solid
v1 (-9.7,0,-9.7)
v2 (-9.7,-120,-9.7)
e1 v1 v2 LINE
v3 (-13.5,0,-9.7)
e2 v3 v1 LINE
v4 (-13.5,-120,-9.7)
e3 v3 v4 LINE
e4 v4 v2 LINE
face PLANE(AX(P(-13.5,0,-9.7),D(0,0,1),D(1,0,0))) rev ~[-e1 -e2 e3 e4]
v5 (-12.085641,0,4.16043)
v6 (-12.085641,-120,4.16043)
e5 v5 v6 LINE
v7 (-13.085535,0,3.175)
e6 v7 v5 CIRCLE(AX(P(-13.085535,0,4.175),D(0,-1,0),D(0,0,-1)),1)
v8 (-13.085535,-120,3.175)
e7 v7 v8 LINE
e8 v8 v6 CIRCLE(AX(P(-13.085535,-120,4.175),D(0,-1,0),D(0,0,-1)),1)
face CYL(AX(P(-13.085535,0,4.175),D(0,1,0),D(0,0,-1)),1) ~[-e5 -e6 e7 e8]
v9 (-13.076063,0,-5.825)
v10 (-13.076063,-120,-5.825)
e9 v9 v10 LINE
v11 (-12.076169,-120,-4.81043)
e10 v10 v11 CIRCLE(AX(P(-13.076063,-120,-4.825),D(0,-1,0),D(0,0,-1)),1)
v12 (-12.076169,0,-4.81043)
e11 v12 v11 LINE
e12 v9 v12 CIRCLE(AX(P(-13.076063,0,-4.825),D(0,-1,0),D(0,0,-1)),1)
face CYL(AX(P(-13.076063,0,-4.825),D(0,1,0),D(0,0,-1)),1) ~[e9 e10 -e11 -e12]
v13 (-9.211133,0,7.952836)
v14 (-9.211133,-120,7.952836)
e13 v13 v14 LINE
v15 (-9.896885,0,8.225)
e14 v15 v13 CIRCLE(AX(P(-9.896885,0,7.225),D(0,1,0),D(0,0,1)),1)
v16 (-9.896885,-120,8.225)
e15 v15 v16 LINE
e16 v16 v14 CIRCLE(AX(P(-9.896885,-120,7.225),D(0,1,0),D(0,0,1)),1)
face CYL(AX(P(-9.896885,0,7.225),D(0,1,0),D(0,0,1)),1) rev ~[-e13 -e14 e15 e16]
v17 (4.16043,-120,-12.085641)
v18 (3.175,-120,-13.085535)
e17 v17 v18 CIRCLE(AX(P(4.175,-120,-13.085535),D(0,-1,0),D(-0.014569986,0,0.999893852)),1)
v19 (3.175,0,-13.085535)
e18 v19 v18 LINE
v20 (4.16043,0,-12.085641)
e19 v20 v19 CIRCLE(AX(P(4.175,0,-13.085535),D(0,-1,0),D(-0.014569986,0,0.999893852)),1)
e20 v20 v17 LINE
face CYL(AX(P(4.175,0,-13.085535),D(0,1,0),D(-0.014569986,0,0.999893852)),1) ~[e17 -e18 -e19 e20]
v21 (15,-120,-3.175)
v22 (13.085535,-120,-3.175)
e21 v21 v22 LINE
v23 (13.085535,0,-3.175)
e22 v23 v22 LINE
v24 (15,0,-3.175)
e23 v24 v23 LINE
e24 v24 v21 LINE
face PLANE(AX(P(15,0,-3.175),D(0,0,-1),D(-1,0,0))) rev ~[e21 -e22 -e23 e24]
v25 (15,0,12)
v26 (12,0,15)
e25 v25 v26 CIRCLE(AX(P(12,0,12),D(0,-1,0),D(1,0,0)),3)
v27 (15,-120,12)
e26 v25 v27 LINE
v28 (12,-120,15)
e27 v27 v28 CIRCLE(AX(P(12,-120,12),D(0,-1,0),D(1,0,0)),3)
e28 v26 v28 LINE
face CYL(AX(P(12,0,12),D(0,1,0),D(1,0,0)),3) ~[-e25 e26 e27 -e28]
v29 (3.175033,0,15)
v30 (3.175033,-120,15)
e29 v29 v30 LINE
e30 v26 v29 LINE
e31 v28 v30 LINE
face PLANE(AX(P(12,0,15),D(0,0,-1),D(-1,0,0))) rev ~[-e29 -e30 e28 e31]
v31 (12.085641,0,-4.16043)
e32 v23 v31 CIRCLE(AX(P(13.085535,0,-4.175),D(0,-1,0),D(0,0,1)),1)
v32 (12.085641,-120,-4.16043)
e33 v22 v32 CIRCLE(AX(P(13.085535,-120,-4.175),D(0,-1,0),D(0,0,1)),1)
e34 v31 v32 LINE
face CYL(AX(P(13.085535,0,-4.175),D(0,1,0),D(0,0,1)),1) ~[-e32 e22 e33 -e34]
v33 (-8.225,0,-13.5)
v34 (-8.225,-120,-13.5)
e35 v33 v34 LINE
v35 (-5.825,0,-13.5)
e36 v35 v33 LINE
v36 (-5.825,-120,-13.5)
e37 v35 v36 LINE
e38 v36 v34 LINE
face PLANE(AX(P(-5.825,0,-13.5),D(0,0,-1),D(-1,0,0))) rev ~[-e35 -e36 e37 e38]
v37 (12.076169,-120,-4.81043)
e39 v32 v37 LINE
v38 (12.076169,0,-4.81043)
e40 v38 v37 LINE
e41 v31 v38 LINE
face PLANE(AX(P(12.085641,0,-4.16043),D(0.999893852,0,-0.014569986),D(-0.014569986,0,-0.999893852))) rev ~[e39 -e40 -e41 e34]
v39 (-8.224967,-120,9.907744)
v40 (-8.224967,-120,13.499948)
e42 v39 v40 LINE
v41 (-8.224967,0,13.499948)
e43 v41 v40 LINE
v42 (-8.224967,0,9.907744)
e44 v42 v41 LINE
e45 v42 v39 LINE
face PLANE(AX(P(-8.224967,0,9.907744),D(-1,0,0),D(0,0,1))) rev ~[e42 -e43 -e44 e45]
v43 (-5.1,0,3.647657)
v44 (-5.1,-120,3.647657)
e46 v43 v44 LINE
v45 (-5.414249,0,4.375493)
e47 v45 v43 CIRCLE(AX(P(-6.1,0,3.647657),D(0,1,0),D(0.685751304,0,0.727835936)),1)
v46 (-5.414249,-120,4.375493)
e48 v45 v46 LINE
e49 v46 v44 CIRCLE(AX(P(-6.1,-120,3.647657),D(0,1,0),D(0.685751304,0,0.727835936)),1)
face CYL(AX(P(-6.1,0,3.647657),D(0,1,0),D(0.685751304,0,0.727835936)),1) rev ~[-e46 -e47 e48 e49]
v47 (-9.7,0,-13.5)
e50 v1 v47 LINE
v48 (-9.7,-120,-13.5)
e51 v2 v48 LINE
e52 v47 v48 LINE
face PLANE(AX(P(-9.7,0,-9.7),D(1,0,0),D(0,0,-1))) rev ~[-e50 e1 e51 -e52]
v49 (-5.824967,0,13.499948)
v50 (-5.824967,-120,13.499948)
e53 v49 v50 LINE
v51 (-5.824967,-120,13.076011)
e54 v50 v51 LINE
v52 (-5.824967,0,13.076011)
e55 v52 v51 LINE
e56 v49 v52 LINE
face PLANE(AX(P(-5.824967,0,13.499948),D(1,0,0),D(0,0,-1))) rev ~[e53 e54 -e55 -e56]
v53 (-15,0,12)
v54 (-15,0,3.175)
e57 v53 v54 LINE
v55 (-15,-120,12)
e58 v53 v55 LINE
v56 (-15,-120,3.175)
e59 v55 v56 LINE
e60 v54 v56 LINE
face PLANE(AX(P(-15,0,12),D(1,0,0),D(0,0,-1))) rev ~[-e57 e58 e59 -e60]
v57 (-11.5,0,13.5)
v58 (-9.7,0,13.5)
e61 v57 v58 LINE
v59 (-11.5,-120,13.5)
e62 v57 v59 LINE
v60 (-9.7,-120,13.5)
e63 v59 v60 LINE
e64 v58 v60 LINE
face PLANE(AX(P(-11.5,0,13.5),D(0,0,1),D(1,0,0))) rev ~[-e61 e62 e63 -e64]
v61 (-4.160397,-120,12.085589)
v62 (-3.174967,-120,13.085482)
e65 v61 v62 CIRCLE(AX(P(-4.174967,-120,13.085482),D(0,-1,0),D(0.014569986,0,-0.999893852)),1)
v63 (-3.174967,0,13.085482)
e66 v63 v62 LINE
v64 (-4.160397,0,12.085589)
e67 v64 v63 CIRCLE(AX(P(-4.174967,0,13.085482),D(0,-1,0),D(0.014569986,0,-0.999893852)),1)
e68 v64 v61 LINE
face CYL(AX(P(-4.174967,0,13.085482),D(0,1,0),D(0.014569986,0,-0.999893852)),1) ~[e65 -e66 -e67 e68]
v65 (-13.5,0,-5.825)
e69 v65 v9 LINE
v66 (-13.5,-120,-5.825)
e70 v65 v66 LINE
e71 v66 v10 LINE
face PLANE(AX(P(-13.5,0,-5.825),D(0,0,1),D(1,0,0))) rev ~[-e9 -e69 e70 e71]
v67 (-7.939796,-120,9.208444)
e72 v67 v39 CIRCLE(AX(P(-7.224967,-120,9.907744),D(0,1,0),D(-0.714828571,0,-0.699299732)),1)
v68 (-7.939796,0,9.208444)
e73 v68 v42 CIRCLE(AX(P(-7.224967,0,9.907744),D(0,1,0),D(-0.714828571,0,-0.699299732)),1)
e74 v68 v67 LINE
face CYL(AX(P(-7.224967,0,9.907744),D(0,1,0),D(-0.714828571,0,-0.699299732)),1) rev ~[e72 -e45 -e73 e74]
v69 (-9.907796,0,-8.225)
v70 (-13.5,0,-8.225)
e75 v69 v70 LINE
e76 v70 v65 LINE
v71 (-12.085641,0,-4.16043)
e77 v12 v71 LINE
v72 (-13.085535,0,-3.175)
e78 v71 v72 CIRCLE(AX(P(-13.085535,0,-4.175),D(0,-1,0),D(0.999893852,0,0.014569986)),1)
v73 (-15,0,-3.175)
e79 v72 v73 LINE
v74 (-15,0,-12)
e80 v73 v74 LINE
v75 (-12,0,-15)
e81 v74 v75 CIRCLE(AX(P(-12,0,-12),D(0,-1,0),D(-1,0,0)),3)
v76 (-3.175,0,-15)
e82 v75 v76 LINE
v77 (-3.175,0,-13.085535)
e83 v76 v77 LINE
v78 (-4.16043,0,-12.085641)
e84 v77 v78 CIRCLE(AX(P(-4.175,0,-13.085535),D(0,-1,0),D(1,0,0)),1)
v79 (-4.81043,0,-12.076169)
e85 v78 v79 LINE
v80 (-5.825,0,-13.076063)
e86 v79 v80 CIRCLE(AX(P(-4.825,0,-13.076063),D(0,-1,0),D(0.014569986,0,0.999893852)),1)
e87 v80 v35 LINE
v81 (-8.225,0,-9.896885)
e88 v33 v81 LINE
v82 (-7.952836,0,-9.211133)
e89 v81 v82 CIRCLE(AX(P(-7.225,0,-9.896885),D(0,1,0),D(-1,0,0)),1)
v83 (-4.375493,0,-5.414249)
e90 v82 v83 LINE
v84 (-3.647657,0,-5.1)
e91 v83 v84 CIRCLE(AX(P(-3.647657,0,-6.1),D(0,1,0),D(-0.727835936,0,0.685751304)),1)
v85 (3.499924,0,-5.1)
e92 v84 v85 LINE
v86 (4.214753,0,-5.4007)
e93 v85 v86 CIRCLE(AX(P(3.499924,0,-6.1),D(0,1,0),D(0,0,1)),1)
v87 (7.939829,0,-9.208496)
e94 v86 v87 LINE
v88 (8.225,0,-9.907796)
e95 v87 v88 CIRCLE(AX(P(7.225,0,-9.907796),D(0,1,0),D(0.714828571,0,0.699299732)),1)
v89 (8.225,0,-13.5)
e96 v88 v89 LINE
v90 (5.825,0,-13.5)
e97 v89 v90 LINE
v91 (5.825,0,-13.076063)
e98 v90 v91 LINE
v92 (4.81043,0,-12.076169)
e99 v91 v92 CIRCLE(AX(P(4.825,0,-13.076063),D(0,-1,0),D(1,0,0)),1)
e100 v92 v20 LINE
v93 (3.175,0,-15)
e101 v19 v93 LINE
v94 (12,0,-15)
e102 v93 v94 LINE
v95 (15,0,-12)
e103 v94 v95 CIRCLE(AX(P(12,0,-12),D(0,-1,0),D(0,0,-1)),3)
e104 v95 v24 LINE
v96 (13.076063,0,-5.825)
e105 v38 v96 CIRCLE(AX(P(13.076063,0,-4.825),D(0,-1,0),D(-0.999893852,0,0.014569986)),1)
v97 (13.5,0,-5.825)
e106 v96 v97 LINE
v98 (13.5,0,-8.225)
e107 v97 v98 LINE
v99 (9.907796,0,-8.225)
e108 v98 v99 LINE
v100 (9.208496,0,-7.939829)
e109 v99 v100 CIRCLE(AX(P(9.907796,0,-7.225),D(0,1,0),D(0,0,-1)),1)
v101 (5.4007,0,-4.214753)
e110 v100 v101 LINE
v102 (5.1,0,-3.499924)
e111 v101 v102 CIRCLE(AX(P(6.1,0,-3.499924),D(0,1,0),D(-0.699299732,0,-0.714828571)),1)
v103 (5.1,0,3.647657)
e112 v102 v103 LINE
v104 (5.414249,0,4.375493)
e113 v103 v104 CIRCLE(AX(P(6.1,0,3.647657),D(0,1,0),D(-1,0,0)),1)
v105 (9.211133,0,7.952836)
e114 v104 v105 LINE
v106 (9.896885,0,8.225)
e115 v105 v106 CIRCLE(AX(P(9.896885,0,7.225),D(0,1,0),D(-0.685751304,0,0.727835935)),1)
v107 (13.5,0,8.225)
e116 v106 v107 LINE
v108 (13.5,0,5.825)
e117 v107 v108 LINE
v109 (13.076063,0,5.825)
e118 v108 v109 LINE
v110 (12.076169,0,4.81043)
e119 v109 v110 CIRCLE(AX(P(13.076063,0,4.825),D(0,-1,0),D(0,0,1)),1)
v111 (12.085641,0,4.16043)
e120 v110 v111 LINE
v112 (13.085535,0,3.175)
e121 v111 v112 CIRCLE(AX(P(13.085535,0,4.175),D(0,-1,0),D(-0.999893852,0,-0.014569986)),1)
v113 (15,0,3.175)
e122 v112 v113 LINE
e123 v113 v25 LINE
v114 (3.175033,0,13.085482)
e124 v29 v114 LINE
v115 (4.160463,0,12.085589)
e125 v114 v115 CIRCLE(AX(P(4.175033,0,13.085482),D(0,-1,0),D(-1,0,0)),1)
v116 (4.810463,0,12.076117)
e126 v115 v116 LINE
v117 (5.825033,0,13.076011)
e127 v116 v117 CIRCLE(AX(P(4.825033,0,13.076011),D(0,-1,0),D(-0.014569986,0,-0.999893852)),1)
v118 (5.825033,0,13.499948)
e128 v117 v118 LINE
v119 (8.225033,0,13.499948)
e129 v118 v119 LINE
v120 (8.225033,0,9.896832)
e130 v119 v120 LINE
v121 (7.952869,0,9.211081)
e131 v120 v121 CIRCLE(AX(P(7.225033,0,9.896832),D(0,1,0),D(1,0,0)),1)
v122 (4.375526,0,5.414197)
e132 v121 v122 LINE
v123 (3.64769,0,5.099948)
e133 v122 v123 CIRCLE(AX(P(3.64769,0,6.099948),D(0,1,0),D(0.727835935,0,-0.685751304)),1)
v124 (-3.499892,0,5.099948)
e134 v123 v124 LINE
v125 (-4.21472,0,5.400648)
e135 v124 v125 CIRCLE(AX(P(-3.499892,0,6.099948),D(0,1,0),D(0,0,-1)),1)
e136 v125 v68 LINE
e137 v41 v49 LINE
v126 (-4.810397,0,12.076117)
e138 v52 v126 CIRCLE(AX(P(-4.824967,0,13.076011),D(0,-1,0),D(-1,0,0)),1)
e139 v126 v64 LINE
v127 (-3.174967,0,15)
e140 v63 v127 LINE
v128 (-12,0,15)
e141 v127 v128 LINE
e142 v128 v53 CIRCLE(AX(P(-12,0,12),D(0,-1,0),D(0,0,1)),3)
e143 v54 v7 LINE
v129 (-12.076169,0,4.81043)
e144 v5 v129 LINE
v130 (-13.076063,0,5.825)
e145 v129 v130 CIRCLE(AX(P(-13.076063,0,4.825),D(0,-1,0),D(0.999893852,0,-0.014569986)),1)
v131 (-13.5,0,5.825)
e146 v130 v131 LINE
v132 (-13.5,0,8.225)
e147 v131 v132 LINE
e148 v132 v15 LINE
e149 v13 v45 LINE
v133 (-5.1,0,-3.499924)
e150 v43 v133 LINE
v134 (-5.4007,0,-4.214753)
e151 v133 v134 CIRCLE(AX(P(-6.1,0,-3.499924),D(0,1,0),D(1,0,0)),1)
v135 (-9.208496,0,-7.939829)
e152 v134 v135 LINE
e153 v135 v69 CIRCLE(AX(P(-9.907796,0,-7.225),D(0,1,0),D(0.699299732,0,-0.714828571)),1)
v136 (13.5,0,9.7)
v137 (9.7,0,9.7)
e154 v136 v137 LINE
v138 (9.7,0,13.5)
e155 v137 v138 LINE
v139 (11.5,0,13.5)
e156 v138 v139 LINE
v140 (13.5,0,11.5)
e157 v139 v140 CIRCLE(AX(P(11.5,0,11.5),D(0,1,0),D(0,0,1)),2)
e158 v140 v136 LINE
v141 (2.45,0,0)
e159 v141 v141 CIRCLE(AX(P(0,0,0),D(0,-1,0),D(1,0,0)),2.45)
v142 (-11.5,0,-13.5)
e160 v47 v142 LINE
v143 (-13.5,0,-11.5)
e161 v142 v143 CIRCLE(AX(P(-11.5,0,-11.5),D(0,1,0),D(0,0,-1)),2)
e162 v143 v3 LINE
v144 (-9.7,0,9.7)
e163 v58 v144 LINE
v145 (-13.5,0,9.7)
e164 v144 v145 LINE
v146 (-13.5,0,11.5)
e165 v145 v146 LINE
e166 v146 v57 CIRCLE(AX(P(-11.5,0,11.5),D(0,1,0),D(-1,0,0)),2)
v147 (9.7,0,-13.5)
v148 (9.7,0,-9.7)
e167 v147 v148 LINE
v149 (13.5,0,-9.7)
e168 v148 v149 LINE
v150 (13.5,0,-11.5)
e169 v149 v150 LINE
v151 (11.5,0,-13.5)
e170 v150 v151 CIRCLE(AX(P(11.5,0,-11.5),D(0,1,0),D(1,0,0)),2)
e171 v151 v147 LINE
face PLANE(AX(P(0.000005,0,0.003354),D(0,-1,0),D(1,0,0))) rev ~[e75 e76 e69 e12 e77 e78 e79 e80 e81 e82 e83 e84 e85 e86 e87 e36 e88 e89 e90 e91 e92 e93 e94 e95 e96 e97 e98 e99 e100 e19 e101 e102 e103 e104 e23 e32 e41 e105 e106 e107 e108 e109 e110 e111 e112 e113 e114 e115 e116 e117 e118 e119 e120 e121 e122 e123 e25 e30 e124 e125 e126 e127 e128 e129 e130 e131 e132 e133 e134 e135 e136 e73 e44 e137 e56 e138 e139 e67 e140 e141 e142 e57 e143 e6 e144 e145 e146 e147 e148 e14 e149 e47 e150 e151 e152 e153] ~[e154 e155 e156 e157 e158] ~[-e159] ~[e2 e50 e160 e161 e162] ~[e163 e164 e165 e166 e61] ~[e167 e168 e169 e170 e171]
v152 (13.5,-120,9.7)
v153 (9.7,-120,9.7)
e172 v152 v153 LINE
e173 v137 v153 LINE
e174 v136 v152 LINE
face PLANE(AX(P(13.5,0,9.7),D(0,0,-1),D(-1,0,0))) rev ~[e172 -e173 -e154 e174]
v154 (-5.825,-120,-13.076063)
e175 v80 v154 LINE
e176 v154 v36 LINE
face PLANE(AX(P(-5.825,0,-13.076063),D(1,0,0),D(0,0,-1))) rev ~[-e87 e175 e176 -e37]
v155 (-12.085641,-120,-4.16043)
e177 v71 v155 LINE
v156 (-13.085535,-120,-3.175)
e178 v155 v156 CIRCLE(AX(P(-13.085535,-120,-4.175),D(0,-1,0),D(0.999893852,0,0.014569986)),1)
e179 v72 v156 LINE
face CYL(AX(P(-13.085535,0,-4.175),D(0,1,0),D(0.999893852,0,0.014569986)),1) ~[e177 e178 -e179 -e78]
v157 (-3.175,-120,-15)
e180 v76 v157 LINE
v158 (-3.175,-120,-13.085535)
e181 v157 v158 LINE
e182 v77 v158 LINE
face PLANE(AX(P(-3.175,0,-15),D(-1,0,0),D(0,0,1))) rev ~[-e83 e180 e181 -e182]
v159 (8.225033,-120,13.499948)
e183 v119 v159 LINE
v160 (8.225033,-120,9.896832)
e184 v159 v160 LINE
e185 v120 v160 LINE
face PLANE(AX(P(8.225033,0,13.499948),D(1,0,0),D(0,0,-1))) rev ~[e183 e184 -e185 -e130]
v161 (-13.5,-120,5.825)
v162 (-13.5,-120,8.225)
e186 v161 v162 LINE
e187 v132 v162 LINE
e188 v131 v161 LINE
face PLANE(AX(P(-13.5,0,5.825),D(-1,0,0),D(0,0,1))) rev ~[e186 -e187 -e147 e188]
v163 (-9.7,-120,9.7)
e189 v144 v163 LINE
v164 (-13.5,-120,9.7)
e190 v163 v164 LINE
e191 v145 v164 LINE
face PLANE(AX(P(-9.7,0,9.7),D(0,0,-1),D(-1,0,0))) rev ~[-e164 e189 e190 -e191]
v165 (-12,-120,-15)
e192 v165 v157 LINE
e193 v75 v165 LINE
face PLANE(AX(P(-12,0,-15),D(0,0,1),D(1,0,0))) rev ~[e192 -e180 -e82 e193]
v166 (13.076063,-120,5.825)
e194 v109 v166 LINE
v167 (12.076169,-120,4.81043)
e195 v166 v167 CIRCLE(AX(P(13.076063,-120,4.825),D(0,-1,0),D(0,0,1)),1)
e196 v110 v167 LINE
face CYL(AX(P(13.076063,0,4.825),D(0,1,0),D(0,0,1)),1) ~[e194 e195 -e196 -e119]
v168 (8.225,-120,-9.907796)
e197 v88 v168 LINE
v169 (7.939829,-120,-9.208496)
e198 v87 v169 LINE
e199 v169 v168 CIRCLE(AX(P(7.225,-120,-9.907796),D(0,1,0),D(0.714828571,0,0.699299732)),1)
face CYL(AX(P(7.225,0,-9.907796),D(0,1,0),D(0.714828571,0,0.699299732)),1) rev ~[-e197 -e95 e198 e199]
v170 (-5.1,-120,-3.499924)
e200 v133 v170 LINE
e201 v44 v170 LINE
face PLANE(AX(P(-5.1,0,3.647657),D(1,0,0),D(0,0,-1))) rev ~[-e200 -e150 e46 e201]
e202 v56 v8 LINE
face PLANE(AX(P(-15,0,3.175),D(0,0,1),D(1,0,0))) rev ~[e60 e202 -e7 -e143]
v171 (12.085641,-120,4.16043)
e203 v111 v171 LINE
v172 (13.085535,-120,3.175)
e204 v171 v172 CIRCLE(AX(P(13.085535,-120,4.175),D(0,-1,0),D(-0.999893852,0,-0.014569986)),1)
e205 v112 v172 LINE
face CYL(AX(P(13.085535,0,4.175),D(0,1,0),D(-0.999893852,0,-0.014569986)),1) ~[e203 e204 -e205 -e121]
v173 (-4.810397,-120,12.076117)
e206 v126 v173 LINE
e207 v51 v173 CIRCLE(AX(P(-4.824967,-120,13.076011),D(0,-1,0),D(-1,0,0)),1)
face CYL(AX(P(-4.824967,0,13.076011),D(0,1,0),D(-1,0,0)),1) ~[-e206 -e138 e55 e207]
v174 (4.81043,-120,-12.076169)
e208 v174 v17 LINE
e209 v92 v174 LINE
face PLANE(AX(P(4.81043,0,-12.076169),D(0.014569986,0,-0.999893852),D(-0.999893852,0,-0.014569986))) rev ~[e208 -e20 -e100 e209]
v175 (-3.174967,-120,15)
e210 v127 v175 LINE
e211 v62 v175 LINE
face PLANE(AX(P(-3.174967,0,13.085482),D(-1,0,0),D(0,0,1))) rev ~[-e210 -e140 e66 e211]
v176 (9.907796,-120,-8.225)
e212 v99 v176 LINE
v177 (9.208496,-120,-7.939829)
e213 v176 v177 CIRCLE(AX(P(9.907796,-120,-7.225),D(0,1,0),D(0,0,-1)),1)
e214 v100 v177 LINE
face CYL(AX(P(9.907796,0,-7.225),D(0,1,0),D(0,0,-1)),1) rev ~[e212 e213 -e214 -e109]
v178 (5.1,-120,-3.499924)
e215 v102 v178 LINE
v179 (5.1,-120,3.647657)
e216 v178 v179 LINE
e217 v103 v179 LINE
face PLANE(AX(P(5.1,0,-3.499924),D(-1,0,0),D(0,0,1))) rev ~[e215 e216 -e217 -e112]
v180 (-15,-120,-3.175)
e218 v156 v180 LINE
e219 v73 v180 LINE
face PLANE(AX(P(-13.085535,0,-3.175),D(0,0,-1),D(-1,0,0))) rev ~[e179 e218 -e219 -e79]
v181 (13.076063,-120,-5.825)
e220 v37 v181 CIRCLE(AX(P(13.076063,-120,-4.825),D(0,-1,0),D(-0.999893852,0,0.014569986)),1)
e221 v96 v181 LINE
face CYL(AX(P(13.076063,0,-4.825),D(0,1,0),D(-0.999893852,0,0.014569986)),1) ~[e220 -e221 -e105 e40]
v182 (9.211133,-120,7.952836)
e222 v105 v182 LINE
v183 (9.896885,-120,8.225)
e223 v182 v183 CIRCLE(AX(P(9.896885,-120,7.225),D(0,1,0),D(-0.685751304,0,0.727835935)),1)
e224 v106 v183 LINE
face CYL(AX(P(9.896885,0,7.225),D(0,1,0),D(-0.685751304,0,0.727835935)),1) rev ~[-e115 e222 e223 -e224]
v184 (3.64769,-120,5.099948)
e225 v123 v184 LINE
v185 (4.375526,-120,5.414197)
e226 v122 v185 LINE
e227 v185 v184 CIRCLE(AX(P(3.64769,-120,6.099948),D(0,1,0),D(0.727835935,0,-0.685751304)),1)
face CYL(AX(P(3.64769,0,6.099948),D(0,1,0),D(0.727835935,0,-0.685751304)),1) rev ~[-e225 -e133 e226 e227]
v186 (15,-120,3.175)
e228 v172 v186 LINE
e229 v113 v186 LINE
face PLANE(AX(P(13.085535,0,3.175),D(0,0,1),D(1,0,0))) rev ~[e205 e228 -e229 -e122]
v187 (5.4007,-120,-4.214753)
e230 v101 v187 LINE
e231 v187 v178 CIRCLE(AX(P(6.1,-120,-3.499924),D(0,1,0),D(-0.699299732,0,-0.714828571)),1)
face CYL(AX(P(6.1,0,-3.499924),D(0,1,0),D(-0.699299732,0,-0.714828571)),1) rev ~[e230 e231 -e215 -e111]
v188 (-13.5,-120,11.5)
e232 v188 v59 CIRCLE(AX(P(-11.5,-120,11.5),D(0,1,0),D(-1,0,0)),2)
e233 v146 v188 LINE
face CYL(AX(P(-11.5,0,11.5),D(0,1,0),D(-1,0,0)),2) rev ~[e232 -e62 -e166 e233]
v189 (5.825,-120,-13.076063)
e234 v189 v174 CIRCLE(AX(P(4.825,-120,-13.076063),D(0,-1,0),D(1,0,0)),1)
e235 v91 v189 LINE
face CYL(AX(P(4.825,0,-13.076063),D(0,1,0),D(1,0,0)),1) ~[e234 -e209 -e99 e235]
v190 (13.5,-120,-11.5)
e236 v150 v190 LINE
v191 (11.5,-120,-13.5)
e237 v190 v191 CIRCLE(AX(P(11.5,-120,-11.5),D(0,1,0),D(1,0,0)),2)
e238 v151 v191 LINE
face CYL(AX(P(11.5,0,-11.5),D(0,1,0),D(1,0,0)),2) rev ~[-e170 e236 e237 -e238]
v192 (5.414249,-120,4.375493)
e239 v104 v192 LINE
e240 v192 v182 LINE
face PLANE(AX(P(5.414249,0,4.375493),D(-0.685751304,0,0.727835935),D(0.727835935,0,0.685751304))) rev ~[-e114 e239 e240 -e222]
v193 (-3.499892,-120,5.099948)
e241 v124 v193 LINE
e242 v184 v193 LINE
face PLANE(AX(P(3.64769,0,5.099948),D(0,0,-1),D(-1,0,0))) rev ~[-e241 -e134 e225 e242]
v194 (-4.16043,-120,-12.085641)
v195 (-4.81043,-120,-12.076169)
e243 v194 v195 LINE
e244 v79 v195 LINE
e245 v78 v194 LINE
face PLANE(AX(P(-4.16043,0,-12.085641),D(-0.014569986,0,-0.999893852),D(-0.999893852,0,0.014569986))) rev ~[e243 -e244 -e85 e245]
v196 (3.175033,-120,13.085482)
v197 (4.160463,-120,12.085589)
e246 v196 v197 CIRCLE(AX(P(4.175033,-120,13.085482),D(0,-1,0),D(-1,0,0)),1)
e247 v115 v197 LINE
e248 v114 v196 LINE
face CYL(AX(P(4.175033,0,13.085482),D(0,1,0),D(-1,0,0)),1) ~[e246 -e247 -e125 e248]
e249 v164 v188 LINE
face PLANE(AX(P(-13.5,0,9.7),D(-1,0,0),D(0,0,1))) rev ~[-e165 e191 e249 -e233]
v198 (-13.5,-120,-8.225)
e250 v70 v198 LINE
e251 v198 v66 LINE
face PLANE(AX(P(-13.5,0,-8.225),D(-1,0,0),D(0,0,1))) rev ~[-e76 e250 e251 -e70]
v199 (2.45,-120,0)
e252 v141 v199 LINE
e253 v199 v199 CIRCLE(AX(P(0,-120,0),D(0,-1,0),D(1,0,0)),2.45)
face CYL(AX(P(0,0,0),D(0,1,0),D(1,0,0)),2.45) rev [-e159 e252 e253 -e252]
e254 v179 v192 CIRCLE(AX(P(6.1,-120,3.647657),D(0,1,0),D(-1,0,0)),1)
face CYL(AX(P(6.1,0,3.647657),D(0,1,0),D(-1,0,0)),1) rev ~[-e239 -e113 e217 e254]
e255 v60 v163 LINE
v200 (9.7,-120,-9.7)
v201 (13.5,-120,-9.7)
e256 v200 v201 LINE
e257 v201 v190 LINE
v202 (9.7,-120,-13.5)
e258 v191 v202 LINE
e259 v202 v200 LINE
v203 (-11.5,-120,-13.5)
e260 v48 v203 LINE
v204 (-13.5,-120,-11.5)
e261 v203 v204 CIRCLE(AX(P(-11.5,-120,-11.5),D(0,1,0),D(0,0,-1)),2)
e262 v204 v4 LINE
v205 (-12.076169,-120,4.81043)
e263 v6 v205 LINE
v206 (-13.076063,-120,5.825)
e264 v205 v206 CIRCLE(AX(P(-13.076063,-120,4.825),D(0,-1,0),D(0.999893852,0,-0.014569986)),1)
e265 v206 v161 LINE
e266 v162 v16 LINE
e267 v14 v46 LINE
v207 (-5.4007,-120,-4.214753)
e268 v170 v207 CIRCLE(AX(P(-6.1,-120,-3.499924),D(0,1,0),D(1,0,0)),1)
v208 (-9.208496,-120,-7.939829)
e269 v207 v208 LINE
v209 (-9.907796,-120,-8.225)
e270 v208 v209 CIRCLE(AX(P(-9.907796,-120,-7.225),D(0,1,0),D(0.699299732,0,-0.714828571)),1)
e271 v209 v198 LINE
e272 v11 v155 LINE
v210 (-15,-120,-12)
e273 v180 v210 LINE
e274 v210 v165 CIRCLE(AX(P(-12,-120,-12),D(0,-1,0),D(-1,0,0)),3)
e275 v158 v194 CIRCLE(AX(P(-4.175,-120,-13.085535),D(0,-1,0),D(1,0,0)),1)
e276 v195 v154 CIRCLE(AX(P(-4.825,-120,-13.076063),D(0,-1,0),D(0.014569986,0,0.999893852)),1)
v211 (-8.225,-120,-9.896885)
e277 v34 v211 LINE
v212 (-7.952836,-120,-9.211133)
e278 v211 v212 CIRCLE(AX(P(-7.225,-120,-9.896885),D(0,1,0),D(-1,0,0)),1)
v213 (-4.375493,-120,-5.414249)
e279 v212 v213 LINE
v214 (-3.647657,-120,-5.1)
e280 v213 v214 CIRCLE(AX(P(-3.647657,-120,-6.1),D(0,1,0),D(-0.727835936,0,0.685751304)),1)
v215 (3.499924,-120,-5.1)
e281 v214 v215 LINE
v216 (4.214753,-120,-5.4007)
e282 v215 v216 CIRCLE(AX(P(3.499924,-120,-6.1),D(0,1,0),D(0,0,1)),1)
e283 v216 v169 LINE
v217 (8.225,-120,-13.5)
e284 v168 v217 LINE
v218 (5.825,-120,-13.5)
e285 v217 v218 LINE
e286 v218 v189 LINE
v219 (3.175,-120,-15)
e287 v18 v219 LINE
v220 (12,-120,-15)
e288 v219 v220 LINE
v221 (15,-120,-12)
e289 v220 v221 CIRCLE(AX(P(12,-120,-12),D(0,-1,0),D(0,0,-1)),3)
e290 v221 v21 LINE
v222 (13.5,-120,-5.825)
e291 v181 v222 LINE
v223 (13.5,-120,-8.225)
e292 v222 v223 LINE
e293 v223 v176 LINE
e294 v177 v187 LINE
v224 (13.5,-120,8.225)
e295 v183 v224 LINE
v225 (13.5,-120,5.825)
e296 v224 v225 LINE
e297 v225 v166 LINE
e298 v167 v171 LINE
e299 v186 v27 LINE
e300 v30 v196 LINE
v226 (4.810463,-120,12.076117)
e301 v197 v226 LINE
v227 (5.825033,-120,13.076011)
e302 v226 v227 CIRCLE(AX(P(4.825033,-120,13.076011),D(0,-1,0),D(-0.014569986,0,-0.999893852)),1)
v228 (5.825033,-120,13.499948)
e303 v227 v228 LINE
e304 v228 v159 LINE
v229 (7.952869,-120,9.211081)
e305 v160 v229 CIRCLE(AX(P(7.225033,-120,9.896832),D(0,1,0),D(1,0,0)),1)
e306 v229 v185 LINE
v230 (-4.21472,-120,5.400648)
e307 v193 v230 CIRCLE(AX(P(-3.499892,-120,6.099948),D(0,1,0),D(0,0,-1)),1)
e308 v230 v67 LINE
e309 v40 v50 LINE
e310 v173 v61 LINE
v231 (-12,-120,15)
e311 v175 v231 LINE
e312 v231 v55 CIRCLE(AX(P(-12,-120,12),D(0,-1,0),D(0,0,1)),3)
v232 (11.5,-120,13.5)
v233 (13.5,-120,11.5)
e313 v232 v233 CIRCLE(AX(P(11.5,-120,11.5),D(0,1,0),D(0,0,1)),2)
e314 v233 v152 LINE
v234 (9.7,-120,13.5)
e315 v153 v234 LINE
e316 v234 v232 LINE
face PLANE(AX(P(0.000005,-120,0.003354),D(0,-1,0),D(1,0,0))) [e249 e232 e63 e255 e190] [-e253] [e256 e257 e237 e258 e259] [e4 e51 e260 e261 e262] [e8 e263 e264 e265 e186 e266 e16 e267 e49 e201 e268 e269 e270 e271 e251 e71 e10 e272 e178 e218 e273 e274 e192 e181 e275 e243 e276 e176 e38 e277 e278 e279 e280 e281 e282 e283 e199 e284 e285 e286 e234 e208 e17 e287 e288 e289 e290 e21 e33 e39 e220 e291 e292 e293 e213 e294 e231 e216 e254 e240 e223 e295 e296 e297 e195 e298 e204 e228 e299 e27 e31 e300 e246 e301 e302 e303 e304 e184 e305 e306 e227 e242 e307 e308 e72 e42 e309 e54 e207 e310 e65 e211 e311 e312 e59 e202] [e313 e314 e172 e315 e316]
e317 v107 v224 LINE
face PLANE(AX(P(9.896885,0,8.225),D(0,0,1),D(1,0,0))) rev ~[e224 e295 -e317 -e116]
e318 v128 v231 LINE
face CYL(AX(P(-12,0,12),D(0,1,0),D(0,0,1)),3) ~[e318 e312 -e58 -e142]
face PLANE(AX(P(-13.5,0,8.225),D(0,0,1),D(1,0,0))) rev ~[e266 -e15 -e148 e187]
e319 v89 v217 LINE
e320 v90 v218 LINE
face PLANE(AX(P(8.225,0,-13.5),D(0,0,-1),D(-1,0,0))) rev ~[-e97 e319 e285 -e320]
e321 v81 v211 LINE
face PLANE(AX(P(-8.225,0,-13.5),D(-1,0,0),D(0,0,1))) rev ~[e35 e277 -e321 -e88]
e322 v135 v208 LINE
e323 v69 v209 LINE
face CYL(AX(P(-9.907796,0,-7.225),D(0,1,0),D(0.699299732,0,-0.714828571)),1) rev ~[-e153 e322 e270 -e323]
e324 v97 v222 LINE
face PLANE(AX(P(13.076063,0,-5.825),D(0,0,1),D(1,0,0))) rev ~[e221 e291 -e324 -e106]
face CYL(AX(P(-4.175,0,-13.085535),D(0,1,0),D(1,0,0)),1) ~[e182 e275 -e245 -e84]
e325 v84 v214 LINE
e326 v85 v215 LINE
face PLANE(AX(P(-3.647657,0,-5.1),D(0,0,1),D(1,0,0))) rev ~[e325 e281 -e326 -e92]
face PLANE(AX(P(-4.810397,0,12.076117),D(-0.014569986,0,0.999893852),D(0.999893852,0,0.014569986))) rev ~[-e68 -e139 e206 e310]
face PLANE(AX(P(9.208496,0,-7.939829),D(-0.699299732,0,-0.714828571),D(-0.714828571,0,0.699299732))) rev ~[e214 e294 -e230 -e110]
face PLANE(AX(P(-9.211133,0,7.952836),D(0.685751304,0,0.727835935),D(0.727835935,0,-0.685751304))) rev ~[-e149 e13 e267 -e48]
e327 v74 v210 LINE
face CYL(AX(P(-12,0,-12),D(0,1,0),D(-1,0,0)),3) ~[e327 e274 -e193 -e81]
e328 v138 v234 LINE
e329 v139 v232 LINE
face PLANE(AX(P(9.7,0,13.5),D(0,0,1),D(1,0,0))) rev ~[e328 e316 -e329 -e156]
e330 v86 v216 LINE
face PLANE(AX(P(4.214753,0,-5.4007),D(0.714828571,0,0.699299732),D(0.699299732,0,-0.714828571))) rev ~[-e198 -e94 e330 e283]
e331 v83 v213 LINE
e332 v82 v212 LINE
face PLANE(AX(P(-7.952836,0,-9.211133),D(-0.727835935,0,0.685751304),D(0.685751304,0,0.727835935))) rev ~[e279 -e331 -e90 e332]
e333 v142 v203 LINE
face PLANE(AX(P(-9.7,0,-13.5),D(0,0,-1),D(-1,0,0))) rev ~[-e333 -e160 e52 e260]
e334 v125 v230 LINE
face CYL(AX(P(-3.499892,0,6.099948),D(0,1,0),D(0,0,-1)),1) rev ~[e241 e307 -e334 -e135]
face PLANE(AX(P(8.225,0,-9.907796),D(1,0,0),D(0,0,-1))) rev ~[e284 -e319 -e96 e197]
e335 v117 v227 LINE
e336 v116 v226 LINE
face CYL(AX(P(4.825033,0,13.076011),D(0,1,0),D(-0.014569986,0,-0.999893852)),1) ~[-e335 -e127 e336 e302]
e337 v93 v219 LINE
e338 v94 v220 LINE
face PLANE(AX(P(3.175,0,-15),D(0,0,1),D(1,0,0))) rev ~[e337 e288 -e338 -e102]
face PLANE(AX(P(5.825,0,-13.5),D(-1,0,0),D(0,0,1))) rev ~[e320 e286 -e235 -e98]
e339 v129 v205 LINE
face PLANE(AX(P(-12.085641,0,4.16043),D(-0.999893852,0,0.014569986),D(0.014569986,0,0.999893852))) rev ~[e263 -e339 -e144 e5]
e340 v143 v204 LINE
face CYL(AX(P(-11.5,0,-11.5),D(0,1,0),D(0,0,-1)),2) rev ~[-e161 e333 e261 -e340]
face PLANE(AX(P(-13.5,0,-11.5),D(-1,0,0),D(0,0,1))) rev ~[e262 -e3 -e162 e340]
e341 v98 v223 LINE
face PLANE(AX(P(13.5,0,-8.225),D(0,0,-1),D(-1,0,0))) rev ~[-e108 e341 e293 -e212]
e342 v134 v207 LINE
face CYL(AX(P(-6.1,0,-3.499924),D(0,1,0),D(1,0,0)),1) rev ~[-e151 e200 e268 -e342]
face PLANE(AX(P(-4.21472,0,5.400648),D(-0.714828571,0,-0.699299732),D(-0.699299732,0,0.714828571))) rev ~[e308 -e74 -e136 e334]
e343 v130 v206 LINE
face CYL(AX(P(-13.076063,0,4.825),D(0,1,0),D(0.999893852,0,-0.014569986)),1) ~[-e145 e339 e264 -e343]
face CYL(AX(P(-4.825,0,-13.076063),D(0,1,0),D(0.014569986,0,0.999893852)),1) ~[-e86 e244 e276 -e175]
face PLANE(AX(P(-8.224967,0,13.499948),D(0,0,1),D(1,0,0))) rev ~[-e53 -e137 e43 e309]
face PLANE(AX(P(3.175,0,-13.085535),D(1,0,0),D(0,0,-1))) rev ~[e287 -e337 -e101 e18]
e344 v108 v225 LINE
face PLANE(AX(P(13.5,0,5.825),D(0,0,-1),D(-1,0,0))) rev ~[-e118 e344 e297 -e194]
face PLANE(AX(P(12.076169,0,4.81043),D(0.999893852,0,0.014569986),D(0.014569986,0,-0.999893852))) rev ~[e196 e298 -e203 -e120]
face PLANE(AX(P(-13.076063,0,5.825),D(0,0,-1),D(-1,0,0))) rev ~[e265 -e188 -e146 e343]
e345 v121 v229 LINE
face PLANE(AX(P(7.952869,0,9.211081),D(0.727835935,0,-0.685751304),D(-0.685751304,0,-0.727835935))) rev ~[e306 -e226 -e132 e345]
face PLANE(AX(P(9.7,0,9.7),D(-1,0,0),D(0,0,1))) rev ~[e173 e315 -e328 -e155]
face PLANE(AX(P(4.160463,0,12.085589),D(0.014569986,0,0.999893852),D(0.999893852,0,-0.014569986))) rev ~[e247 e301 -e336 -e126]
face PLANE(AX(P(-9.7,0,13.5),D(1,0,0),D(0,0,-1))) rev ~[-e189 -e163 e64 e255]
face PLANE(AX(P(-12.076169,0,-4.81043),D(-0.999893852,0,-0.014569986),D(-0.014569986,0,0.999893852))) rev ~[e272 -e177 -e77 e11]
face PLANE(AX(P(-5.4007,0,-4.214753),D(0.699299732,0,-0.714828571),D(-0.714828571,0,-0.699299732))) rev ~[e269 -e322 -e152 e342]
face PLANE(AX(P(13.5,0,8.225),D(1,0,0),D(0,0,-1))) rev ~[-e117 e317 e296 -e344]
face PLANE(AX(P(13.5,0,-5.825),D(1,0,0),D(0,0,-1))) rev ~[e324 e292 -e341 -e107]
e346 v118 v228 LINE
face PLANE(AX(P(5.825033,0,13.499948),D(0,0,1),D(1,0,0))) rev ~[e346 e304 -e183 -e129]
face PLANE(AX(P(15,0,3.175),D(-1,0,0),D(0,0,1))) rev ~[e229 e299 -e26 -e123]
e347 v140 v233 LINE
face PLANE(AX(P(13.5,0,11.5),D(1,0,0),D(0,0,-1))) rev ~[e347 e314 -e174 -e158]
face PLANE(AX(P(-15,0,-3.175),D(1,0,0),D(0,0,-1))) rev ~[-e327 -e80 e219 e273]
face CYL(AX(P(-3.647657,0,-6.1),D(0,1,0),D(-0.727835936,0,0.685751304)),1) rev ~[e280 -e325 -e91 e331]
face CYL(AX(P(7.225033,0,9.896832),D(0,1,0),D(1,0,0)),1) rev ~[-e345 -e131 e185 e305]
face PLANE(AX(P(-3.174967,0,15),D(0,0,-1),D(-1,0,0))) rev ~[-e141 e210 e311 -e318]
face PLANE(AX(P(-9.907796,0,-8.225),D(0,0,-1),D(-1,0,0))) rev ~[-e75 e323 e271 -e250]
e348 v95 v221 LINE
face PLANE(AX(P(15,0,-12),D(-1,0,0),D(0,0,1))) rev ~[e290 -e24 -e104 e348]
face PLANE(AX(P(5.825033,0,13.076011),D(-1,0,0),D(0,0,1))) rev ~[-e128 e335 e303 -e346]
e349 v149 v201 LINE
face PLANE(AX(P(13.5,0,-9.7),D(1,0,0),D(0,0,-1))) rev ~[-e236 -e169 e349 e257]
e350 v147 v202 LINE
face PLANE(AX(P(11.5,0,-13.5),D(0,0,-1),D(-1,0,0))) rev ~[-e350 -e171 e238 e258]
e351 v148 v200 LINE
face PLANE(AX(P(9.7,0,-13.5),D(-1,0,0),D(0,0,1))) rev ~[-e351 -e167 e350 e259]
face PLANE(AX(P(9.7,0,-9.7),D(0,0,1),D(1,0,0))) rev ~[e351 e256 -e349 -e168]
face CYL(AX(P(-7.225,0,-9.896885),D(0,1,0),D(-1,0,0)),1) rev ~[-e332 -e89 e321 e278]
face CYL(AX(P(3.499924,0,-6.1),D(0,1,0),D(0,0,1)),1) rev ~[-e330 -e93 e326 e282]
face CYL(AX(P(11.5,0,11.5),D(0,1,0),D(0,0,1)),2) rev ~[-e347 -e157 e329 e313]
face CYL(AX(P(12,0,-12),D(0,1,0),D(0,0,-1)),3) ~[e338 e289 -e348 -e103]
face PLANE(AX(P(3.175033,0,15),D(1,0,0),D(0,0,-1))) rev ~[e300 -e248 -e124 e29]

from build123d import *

# Parameters (mm, degrees)
F0_R     = 2.45
F1_DEPTH = 460
F2_DEPTH = 340


# Not quite as in the source:
# - ends of sketch curves that miss each other by under 0.0002 mm in the source are joined


with BuildPart() as f1:
    # F0 (on Front) → F1 (new body)
    with BuildSketch(Plane.XZ):
        with BuildLine():
            Line((-3.1749674082, 15), (-12, 15))
            ThreePointArc((-12, 15), (-14.1213203436, 14.1213203436), (-15, 12))
            Line((-15, 12), (-15, 3.175))
            Line((-15, 3.175), (-13.0855346263, 3.175))
            ThreePointArc((-13.0855346263, 3.175), (-12.3835980145, 3.4627605788), (-12.0856407741, 4.1604300138))
            Line((-12.0856407741, 4.1604300138), (-12.0761692778, 4.8104300138))
            ThreePointArc((-12.0761692778, 4.8104300138), (-12.3638237087, 5.5269366118), (-13.0760631299, 5.825))
            Line((-13.0760631299, 5.825), (-13.5, 5.825))
            Line((-13.5, 5.825), (-13.5, 8.225))
            Line((-13.5, 8.225), (-9.8968845016, 8.225))
            ThreePointArc((-9.8968845016, 8.225), (-9.5279915195, 8.1544718757), (-9.2111331975, 7.9528359354))
            Line((-9.2111331975, 7.9528359354), (-5.4142486959, 4.3754933338))
            ThreePointArc((-5.4142486959, 4.3754933338), (-5.1819174045, 4.0440465354), (-5.1, 3.6476573984))
            Line((-5.1, 3.6476573984), (-5.1, -3.4999243287))
            ThreePointArc((-5.1, -3.4999243287), (-5.1782354607, -3.8876744211), (-5.4007002683, -4.2147528992))
            Line((-5.4007002683, -4.2147528992), (-9.2084959767, -7.9398285705))
            ThreePointArc((-9.2084959767, -7.9398285705), (-9.5301904718, -8.1509666761), (-9.9077957084, -8.225))
            Line((-9.9077957084, -8.225), (-13.5, -8.225))
            Line((-13.5, -8.225), (-13.5, -5.825))
            Line((-13.5, -5.825), (-13.0760631299, -5.825))
            ThreePointArc((-13.0760631299, -5.825), (-12.3638237087, -5.5269366118), (-12.0761692778, -4.8104300138))
            Line((-12.0761692778, -4.8104300138), (-12.0856407741, -4.1604300138))
            ThreePointArc((-12.0856407741, -4.1604300138), (-12.3835980145, -3.4627605788), (-13.0855346263, -3.175))
            Line((-13.0855346263, -3.175), (-15, -3.175))
            Line((-15, -3.175), (-15, -12))
            ThreePointArc((-15, -12), (-14.1213203436, -14.1213203436), (-12, -15))
            Line((-12, -15), (-3.175, -15))
            Line((-3.175, -15), (-3.175, -13.0855346263))
            ThreePointArc((-3.175, -13.0855346263), (-3.4627605788, -12.3835980145), (-4.1604300138, -12.0856407741))
            Line((-4.1604300138, -12.0856407741), (-4.8104300138, -12.0761692778))
            ThreePointArc((-4.8104300138, -12.0761692778), (-5.5269366118, -12.3638237087), (-5.825, -13.0760631299))
            Line((-5.825, -13.0760631299), (-5.825, -13.5))
            Line((-5.825, -13.5), (-8.225, -13.5))
            Line((-8.225, -13.5), (-8.225, -9.8968845016))
            ThreePointArc((-8.225, -9.8968845016), (-8.1544718757, -9.5279915195), (-7.9528359354, -9.2111331975))
            Line((-7.9528359354, -9.2111331975), (-4.3754933338, -5.4142486959))
            ThreePointArc((-4.3754933338, -5.4142486959), (-4.0440465354, -5.1819174045), (-3.6476573984, -5.1))
            Line((-3.6476573984, -5.1), (3.4999243287, -5.1))
            ThreePointArc((3.4999243287, -5.1), (3.8876744211, -5.1782354607), (4.2147528992, -5.4007002683))
            Line((4.2147528992, -5.4007002683), (7.9398285705, -9.2084959767))
            ThreePointArc((7.9398285705, -9.2084959767), (8.1509666761, -9.5301904718), (8.225, -9.9077957084))
            Line((8.225, -9.9077957084), (8.225, -13.5))
            Line((8.225, -13.5), (5.825, -13.5))
            Line((5.825, -13.5), (5.825, -13.0760631299))
            ThreePointArc((5.825, -13.0760631299), (5.5269366118, -12.3638237087), (4.8104300138, -12.0761692778))
            Line((4.8104300138, -12.0761692778), (4.1604300138, -12.0856407741))
            ThreePointArc((4.1604300138, -12.0856407741), (3.4627605788, -12.3835980145), (3.175, -13.0855346263))
            Line((3.175, -13.0855346263), (3.175, -15))
            Line((3.175, -15), (12, -15))
            ThreePointArc((12, -15), (14.1213203436, -14.1213203436), (15, -12))
            Line((15, -12), (15, -3.175))
            Line((15, -3.175), (13.0855346263, -3.175))
            ThreePointArc((13.0855346263, -3.175), (12.3835980145, -3.4627605788), (12.0856407741, -4.1604300138))
            Line((12.0856407741, -4.1604300138), (12.0761692778, -4.8104300138))
            ThreePointArc((12.0761692778, -4.8104300138), (12.3638237087, -5.5269366118), (13.0760631299, -5.825))
            Line((13.0760631299, -5.825), (13.5, -5.825))
            Line((13.5, -5.825), (13.5, -8.225))
            Line((13.5, -8.225), (9.9077957084, -8.225))
            ThreePointArc((9.9077957084, -8.225), (9.5301904718, -8.1509666761), (9.2084959767, -7.9398285705))
            Line((9.2084959767, -7.9398285705), (5.4007002683, -4.2147528992))
            ThreePointArc((5.4007002683, -4.2147528992), (5.1782354607, -3.8876744211), (5.1, -3.4999243287))
            Line((5.1, -3.4999243287), (5.1, 3.6476573984))
            ThreePointArc((5.1, 3.6476573984), (5.1819174045, 4.0440465354), (5.4142486959, 4.3754933338))
            Line((5.4142486959, 4.3754933338), (9.2111331975, 7.9528359354))
            ThreePointArc((9.2111331975, 7.9528359354), (9.5279915195, 8.1544718757), (9.8968845016, 8.225))
            Line((9.8968845016, 8.225), (13.5, 8.225))
            Line((13.5, 8.225), (13.5, 5.825))
            Line((13.5, 5.825), (13.0760631299, 5.825))
            ThreePointArc((13.0760631299, 5.825), (12.3638237087, 5.5269366118), (12.0761692778, 4.8104300138))
            Line((12.0761692778, 4.8104300138), (12.0856407741, 4.1604300138))
            ThreePointArc((12.0856407741, 4.1604300138), (12.3835980145, 3.4627605788), (13.0855346263, 3.175))
            Line((13.0855346263, 3.175), (15, 3.175))
            Line((15, 3.175), (15, 12))
            ThreePointArc((15, 12), (14.1213203436, 14.1213203436), (12, 15))
            Line((12, 15), (3.1750325918, 15))
            Line((3.1750325918, 15), (3.1750325918, 13.0854824722))
            ThreePointArc((3.1750325918, 13.0854824722), (3.4627931706, 12.3835458604), (4.1604626057, 12.0855886201))
            Line((4.1604626057, 12.0855886201), (4.8104626057, 12.0761171237))
            ThreePointArc((4.8104626057, 12.0761171237), (5.5269692036, 12.3637715546), (5.8250325918, 13.0760109758))
            Line((5.8250325918, 13.0760109758), (5.8250325918, 13.4999478459))
            Line((5.8250325918, 13.4999478459), (8.2250325918, 13.4999478459))
            Line((8.2250325918, 13.4999478459), (8.2250325918, 9.8968323476))
            ThreePointArc((8.2250325918, 9.8968323476), (8.1545044675, 9.5279393654), (7.9528685272, 9.2110810434))
            Line((7.9528685272, 9.2110810434), (4.3755259256, 5.4141965418))
            ThreePointArc((4.3755259256, 5.4141965418), (4.0440791272, 5.1818652505), (3.6476899902, 5.0999478459))
            Line((3.6476899902, 5.0999478459), (-3.4998917369, 5.0999478459))
            ThreePointArc((-3.4998917369, 5.0999478459), (-3.8876418293, 5.1781833067), (-4.2147203074, 5.4006481142))
            Line((-4.2147203074, 5.4006481142), (-7.9397959787, 9.2084438226))
            ThreePointArc((-7.9397959787, 9.2084438226), (-8.1509340843, 9.5301383177), (-8.2249674082, 9.9077435543))
            Line((-8.2249674082, 9.9077435543), (-8.2249674082, 13.4999478459))
            Line((-8.2249674082, 13.4999478459), (-5.8249674082, 13.4999478459))
            Line((-5.8249674082, 13.4999478459), (-5.8249674082, 13.0760109758))
            ThreePointArc((-5.8249674082, 13.0760109758), (-5.5269040199, 12.3637715546), (-4.810397422, 12.0761171237))
            Line((-4.810397422, 12.0761171237), (-4.160397422, 12.0855886201))
            ThreePointArc((-4.160397422, 12.0855886201), (-3.462727987, 12.3835458604), (-3.1749674082, 13.0854824722))
            Line((-3.1749674082, 13.0854824722), (-3.1749674082, 15))
        make_face()
        with BuildLine():
            Line((-13.5, -11.5), (-13.5, -9.7))
            Line((-13.5, -9.7), (-9.7, -9.7))
            Line((-9.7, -9.7), (-9.7, -13.5))
            Line((-9.7, -13.5), (-11.5, -13.5))
            ThreePointArc((-11.5, -13.5), (-12.9142135624, -12.9142135624), (-13.5, -11.5))
        make_face(mode=Mode.SUBTRACT)
        with BuildLine():
            Line((9.7, -9.7), (13.5, -9.7))
            Line((13.5, -9.7), (13.5, -11.5))
            ThreePointArc((13.5, -11.5), (12.9142135624, -12.9142135624), (11.5, -13.5))
            Line((11.5, -13.5), (9.7, -13.5))
            Line((9.7, -13.5), (9.7, -9.7))
        make_face(mode=Mode.SUBTRACT)
        with BuildLine():
            ThreePointArc((-13.5, 11.5), (-12.9142135624, 12.9142135624), (-11.5, 13.5))
            Line((-11.5, 13.5), (-9.7, 13.5))
            Line((-9.7, 13.5), (-9.7, 9.7))
            Line((-9.7, 9.7), (-13.5, 9.7))
            Line((-13.5, 9.7), (-13.5, 11.5))
        make_face(mode=Mode.SUBTRACT)
        Circle(F0_R, mode=Mode.SUBTRACT)
        with BuildLine():
            Line((9.7, 13.5), (11.5, 13.5))
            ThreePointArc((11.5, 13.5), (12.9142135624, 12.9142135624), (13.5, 11.5))
            Line((13.5, 11.5), (13.5, 9.7))
            Line((13.5, 9.7), (9.7, 9.7))
            Line((9.7, 9.7), (9.7, 13.5))
        make_face(mode=Mode.SUBTRACT)
    extrude(amount=F1_DEPTH)

    # F2 (cut): a face of the model
    f2_faces = [f1.faces().sort_by_distance(p)[0] for p in [
        (5.2291627207, -460, 12.6659491494),
    ]]
    extrude(f2_faces, amount=-F2_DEPTH, mode=Mode.SUBTRACT)


solid = f1.part
